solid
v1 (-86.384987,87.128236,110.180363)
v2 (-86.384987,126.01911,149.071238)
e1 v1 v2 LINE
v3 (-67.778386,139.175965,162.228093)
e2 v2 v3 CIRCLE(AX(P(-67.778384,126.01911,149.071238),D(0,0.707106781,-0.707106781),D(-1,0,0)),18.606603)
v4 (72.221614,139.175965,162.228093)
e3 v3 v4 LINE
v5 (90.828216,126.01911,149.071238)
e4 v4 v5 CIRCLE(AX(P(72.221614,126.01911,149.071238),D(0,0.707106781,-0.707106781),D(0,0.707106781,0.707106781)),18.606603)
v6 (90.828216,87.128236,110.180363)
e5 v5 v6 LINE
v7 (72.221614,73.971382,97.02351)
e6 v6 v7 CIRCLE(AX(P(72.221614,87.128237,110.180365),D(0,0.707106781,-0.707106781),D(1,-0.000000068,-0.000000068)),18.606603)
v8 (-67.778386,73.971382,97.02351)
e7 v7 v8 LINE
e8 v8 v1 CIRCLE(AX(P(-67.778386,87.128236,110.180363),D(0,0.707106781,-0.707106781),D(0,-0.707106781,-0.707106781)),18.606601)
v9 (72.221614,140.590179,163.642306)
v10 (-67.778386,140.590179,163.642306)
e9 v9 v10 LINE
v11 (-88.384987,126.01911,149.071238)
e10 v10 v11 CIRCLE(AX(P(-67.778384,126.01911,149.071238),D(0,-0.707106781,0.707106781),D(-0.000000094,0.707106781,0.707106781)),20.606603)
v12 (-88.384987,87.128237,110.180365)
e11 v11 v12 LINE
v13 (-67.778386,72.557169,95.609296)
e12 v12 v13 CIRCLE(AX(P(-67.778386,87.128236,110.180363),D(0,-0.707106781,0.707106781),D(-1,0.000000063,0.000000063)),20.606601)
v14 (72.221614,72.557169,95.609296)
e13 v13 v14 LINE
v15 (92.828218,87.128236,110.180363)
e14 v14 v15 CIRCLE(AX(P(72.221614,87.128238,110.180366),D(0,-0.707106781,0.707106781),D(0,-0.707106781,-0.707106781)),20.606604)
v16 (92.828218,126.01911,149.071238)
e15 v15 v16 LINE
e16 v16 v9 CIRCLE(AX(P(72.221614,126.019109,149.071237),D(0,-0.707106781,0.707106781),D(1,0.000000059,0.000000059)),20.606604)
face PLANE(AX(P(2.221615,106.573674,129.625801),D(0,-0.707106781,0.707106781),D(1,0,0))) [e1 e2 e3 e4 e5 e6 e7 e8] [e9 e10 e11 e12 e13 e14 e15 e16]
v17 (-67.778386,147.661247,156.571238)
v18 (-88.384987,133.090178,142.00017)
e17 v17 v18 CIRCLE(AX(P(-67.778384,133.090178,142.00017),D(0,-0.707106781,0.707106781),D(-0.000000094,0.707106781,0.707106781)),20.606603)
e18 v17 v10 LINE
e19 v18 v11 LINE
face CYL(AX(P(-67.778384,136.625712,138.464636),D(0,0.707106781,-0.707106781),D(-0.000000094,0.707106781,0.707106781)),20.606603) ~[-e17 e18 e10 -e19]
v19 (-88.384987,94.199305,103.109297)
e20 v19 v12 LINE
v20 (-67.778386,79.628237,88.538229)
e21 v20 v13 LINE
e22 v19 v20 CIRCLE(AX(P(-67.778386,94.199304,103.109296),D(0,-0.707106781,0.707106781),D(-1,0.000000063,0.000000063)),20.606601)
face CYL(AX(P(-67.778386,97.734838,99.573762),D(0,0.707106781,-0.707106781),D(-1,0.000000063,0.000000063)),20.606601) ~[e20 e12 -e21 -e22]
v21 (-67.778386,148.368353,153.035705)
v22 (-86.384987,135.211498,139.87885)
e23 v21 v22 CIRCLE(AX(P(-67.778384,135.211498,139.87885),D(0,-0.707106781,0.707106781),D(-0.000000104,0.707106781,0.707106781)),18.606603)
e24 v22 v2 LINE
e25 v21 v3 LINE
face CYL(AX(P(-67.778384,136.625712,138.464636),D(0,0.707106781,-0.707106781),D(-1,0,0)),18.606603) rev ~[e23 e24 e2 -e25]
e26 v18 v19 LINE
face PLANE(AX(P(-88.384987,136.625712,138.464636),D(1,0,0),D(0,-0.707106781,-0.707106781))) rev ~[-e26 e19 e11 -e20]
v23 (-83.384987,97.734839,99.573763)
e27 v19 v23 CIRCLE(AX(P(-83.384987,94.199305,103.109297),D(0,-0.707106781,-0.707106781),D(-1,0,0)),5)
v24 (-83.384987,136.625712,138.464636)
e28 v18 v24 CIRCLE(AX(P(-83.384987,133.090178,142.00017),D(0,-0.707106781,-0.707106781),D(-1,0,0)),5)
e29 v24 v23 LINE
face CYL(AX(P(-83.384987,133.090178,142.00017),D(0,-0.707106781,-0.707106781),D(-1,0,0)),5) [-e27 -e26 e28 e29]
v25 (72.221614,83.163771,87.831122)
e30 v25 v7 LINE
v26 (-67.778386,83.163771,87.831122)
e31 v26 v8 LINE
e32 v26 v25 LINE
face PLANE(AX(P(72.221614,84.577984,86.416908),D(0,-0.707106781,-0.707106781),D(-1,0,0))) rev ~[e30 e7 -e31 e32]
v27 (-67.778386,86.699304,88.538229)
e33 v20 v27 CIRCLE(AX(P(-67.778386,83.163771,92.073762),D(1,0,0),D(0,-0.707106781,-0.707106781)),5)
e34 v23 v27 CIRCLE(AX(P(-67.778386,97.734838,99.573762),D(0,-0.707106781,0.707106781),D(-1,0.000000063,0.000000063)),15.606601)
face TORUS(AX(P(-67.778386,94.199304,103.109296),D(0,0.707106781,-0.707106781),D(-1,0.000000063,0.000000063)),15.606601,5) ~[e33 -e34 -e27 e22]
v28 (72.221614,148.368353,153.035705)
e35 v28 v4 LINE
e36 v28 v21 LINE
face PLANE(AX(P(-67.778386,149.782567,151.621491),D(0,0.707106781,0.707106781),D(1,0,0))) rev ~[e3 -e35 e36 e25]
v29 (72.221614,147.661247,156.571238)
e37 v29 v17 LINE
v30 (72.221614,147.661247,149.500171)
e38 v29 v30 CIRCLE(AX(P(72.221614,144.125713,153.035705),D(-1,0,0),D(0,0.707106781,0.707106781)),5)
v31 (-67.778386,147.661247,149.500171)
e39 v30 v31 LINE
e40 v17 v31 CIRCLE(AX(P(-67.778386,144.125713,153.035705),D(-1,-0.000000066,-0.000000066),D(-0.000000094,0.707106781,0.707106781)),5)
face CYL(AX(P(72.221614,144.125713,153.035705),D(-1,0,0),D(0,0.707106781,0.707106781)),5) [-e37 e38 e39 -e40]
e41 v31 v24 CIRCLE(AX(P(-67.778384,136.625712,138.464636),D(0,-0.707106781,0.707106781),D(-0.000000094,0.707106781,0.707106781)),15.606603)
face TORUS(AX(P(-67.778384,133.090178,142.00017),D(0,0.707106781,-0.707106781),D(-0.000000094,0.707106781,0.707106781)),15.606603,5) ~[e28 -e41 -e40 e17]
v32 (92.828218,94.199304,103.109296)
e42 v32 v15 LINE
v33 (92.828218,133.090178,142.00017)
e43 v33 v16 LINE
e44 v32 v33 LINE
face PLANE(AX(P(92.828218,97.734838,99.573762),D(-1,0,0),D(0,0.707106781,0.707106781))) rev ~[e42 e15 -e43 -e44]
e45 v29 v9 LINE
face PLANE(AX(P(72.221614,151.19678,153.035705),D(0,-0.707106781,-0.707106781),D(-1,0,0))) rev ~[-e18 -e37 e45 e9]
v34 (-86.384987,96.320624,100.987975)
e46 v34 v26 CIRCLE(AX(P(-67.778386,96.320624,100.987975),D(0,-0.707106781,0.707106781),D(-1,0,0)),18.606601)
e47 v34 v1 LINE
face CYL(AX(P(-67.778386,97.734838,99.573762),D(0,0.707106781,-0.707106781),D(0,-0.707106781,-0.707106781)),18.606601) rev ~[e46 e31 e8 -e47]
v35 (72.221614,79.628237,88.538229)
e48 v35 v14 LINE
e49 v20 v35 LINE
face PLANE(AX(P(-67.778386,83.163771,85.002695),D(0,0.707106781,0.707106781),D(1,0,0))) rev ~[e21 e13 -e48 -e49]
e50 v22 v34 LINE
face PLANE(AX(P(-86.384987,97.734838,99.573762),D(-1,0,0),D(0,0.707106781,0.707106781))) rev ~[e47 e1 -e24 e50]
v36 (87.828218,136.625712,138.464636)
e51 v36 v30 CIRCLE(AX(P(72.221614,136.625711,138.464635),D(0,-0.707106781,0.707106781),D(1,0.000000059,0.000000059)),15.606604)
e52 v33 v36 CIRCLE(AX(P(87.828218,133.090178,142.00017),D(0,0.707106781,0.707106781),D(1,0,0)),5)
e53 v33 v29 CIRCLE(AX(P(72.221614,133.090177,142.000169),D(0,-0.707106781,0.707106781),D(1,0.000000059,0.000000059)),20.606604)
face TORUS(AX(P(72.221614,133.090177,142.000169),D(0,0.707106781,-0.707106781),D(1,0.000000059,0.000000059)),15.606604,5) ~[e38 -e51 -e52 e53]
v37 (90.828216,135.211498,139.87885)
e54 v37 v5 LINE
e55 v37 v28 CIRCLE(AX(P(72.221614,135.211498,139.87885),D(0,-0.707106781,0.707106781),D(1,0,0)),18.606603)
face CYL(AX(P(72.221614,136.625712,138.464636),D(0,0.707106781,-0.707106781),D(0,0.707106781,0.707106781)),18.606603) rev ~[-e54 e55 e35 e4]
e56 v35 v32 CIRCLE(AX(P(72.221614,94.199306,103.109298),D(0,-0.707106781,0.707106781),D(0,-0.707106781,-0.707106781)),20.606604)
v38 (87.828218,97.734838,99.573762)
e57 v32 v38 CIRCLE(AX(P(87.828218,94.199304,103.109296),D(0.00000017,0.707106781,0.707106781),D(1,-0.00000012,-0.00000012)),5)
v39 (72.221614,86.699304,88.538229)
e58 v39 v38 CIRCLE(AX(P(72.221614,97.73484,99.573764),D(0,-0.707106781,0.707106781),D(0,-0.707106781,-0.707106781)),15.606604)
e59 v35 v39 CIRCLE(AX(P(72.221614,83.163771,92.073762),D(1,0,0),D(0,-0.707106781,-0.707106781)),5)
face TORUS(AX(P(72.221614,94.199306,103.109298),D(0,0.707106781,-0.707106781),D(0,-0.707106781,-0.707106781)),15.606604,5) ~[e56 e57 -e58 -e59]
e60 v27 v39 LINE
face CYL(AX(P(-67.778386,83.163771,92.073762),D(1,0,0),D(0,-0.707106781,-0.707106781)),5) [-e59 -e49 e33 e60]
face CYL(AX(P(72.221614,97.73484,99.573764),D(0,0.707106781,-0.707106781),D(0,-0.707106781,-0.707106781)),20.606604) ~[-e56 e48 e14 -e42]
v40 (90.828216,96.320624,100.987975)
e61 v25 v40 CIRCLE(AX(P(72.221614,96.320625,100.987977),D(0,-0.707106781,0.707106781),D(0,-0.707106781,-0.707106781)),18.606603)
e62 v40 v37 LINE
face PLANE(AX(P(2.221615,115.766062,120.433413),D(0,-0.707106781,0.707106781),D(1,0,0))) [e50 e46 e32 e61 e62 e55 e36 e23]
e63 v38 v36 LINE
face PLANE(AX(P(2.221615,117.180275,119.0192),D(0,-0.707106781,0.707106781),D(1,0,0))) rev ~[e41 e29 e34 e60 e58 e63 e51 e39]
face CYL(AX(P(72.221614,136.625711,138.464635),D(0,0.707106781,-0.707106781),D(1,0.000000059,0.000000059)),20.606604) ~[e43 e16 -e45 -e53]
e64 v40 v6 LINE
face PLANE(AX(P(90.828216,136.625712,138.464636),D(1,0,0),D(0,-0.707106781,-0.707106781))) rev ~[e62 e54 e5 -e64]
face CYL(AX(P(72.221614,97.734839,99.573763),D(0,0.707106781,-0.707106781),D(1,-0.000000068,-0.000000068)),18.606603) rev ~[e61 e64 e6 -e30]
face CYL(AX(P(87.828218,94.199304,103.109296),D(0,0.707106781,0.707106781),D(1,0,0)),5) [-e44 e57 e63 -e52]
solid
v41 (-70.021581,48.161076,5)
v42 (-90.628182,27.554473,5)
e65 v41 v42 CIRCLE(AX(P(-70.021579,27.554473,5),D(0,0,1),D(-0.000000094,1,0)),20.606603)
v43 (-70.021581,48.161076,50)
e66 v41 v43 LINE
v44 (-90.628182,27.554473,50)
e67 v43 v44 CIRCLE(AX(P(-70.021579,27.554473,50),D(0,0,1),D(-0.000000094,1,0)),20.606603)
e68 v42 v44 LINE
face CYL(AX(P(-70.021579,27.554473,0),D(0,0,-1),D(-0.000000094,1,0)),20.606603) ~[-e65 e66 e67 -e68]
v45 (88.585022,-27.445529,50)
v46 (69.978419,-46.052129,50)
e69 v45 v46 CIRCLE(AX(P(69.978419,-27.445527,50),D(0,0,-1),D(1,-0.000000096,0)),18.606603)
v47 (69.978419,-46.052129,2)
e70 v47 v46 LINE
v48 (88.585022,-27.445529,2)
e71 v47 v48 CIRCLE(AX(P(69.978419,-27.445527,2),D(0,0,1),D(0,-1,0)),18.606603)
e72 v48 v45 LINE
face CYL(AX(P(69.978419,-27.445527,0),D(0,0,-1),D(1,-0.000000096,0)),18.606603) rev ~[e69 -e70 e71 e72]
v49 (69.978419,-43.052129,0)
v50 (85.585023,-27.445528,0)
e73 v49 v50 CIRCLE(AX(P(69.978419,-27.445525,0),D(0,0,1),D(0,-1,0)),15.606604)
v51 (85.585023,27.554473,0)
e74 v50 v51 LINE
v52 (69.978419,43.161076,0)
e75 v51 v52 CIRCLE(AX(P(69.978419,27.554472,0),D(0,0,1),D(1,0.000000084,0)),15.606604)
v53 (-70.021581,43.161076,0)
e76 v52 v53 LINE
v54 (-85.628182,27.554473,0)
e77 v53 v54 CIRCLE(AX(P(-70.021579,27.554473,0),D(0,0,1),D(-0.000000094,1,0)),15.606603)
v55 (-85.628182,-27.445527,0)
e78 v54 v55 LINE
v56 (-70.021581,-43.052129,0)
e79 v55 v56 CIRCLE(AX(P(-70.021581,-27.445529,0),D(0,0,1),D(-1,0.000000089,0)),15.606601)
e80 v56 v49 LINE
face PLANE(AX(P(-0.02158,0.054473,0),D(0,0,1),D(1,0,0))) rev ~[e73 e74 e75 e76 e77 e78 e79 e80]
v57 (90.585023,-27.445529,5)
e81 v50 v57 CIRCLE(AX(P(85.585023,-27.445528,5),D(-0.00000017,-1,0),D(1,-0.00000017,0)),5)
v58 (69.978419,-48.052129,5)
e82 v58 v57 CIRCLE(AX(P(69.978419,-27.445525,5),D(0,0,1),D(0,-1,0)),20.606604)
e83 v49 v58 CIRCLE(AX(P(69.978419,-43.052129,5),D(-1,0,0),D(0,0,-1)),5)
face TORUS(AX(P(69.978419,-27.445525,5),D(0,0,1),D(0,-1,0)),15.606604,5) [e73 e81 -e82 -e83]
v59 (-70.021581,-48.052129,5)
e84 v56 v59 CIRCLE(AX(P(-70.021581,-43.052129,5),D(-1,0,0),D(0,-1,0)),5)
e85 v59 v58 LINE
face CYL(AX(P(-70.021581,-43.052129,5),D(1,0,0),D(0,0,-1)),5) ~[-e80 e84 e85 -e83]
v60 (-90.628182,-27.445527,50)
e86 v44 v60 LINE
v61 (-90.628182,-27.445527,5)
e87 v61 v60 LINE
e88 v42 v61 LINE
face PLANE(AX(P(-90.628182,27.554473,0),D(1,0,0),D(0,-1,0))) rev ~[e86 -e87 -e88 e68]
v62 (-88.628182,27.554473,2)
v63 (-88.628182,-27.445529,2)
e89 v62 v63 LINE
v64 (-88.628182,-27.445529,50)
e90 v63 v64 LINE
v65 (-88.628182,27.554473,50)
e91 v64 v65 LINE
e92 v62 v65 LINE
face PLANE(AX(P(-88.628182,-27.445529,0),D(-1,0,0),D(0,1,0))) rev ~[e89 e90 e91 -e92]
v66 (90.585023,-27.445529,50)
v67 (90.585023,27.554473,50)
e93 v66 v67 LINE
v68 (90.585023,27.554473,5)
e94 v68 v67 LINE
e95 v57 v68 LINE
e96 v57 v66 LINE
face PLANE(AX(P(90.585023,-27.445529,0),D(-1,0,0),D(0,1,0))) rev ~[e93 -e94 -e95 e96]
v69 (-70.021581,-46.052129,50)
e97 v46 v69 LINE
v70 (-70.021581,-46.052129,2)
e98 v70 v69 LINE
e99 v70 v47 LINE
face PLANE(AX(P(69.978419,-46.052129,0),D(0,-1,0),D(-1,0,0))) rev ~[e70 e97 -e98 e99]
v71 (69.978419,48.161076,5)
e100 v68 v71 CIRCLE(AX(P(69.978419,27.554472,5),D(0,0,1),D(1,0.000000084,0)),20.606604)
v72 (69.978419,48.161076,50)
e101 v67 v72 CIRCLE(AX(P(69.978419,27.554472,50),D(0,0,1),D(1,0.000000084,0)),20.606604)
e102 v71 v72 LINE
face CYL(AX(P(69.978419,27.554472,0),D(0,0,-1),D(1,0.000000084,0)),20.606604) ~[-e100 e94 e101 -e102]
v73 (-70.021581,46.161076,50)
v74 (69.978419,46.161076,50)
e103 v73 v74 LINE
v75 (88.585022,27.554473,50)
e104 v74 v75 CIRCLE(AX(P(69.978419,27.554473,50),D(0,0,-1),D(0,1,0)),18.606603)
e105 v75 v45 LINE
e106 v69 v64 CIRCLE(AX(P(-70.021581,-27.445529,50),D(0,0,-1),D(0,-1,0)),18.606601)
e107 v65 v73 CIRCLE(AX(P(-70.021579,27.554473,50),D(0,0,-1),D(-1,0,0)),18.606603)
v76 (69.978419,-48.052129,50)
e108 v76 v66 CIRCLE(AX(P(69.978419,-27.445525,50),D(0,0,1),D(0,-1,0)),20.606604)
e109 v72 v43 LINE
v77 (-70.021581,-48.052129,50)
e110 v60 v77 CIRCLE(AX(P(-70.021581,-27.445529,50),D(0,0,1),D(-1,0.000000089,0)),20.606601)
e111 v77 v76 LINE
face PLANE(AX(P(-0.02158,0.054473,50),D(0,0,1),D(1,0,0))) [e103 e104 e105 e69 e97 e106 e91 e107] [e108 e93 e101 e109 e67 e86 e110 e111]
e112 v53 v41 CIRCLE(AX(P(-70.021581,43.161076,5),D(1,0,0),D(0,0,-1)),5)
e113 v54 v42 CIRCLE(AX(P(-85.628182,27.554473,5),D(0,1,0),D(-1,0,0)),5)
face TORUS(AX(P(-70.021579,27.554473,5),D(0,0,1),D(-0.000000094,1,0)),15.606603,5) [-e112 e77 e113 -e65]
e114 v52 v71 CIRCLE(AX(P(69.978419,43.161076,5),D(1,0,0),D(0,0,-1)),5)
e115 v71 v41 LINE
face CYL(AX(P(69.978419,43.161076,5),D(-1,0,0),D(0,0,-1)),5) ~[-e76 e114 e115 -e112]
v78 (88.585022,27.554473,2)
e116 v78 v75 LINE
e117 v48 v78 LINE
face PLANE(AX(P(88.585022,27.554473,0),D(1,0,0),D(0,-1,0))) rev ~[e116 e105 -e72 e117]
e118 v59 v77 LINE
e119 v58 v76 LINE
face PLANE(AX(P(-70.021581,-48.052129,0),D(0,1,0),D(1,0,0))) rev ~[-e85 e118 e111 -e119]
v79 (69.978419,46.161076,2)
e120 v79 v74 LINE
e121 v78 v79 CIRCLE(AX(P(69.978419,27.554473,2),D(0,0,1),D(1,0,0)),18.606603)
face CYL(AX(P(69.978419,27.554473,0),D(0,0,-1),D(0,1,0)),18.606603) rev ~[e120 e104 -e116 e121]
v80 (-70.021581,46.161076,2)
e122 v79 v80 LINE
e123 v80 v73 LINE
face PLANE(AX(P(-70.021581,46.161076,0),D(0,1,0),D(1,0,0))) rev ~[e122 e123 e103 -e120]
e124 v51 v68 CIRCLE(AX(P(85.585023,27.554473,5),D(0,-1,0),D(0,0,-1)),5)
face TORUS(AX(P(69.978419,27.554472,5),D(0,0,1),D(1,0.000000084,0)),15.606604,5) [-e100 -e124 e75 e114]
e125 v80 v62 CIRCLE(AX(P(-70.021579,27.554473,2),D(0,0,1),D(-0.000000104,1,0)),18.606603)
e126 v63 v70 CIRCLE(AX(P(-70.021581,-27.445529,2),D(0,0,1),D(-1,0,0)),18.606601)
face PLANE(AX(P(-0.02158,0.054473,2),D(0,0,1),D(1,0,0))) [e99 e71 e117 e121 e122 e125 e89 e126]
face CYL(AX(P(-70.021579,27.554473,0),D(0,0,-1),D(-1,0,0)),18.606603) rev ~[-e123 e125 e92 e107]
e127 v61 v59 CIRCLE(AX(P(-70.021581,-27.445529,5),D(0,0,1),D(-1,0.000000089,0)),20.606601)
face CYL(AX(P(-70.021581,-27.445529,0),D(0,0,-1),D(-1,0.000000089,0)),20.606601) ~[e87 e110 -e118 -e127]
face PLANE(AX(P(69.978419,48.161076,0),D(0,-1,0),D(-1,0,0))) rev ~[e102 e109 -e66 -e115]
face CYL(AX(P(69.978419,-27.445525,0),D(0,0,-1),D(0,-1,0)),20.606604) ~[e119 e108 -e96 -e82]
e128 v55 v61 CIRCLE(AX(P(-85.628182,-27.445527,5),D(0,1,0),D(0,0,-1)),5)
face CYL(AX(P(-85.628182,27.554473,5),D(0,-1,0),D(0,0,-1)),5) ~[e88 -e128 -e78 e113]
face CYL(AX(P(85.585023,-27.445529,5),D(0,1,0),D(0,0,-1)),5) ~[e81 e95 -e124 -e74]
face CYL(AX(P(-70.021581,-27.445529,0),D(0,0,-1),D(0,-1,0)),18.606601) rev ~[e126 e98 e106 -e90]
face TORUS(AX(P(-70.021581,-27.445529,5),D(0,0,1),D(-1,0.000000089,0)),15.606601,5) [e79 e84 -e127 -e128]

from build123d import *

# Parameters (mm, degrees)
F1_DEPTH = 50
F2_DEPTH = 2
F5_DEPTH = 2
F6_DEPTH = 15
F8_W     = 20
F8_H     = 2.4975641537
F9_DEPTH = 2
F10_R    = 5
F11_R    = 5


# Not quite as in the source:
# - a feature names something its author has since deleted; it is built from what else it names


with BuildPart() as f1:
    # F0 (on Top) → F1 (new body)
    with BuildSketch(Plane.XY):
        with BuildLine():
            ThreePointArc((-70.0215809153, 48.1610759377), (-84.5926481603, 42.1255410641), (-90.6281816654, 27.5544732523))
            Line((-90.6281816654, 27.5544732523), (-90.6281816654, -27.4455267477))
            ThreePointArc((-90.6281816654, -27.4455267477), (-84.5926486755, -42.0165950962), (-70.0215808636, -48.0521293815))
            Line((-70.0215808636, -48.0521293815), (69.9784191364, -48.0521293815))
            ThreePointArc((69.9784191364, -48.0521293815), (84.5494875406, -42.0165959566), (90.5850234457, -27.4455285797))
            Line((90.5850234457, -27.4455285797), (90.5850234457, 27.5544733039))
            ThreePointArc((90.5850234457, 27.5544733039), (84.5494881549, 42.1255418682), (69.9784190847, 48.1610759377))
            Line((69.9784190847, 48.1610759377), (-70.0215809153, 48.1610759377))
        make_face()
        with BuildLine():
            Line((69.9784191364, -46.0521293815), (-70.0215808636, -46.0521293815))
            ThreePointArc((-70.0215808636, -46.0521293815), (-83.1784344654, -40.6023821815), (-88.6281816654, -27.4455285797))
            Line((-88.6281816654, -27.4455285797), (-88.6281816654, 27.5544732523))
            ThreePointArc((-88.6281816654, 27.5544732523), (-83.1784345979, 40.7113275017), (-70.0215809153, 46.1610759377))
            Line((-70.0215809153, 46.1610759377), (69.9784190847, 46.1610759377))
            ThreePointArc((69.9784190847, 46.1610759377), (83.1352739819, 40.7113282011), (88.5850217185, 27.5544733039))
            Line((88.5850217185, 27.5544733039), (88.5850217185, -27.4455285797))
            ThreePointArc((88.5850217185, -27.4455285797), (83.1352733676, -40.6023822895), (69.9784191364, -46.0521293815))
        make_face(mode=Mode.SUBTRACT)
    extrude(amount=F1_DEPTH)

    # F0 (on Top) → F2 (join)
    with BuildSketch(Plane.XY):
        with BuildLine():
            ThreePointArc((-88.6281816654, -27.4455285797), (-83.1784344654, -40.6023821815), (-70.0215808636, -46.0521293815))
            Line((-70.0215808636, -46.0521293815), (69.9784191364, -46.0521293815))
            ThreePointArc((69.9784191364, -46.0521293815), (83.1352733676, -40.6023822895), (88.5850217185, -27.4455285797))
            Line((88.5850217185, -27.4455285797), (88.5850217185, 27.5544733039))
            ThreePointArc((88.5850217185, 27.5544733039), (83.1352739819, 40.7113282011), (69.9784190847, 46.1610759377))
            Line((69.9784190847, 46.1610759377), (-70.0215809153, 46.1610759377))
            ThreePointArc((-70.0215809153, 46.1610759377), (-83.1784345979, 40.7113275017), (-88.6281816654, 27.5544732523))
            Line((-88.6281816654, 27.5544732523), (-88.6281816654, -27.4455285797))
        make_face()
    extrude(amount=F2_DEPTH)

    # F8 (on face) → F9 (cut)
    with BuildSketch(Plane(origin=(0, 84.0832325734, 84.0832325734), x_dir=(1, 0, 0), z_dir=(0, -0.7071067812, -0.7071067812))):
        with Locations((0, -0.5405465653)):
            Rectangle(F8_W, F8_H)
    extrude(amount=-F9_DEPTH, mode=Mode.SUBTRACT)

    # F11
    f11_edges = [f1.edges().sort_by_distance(p)[0] for p in [
        (-0.021581, 48.161076, 0),
        (-84.592648, 42.125541, 0),
        (-90.628182, 0.054473, 0),
        (-84.592649, -42.016595, 0),
        (-0.021581, -48.052129, 0),
        (84.549488, -42.016596, 0),
        (90.585023, 0.054472, 0),
        (84.549488, 42.125542, 0),
    ]]
    fillet(f11_edges, radius=F11_R)


with BuildPart() as f5:
    # F4 (on face) → F5 (new body)
    with BuildSketch(Plane(origin=(0, -0.9194620312, 0.9194620312), x_dir=(1, 0, 0), z_dir=(0, -0.7071067812, 0.7071067812))):
        with BuildLine():
            ThreePointArc((-86.3849869775, 139.5182486753), (-80.9352397774, 126.3613950735), (-67.7783861756, 120.9116478734))
            Line((-67.7783861756, 120.9116478734), (72.2216138244, 120.9116478734))
            ThreePointArc((72.2216138244, 120.9116478734), (85.3784680556, 126.3613949655), (90.8282164065, 139.5182486753))
            Line((90.8282164065, 139.5182486753), (90.8282164065, 194.5182505589))
            ThreePointArc((90.8282164065, 194.5182505589), (85.3784686699, 207.675105456), (72.2216137727, 213.1248531926))
            Line((72.2216137727, 213.1248531926), (-67.7783862273, 213.1248531926))
            ThreePointArc((-67.7783862273, 213.1248531926), (-80.93523991, 207.6751047567), (-86.3849869775, 194.5182505072))
            Line((-86.3849869775, 194.5182505072), (-86.3849869775, 139.5182486753))
        make_face()
    extrude(amount=F5_DEPTH)

    # F4 (on face) → F6 (join)
    with BuildSketch(Plane(origin=(0, -0.9194620312, 0.9194620312), x_dir=(1, 0, 0), z_dir=(0, -0.7071067812, 0.7071067812))):
        with BuildLine():
            ThreePointArc((-67.7783862273, 215.1248531926), (-82.3494534723, 209.0893183191), (-88.3849869775, 194.5182505072))
            Line((-88.3849869775, 194.5182505072), (-88.3849869775, 139.5182505072))
            ThreePointArc((-88.3849869775, 139.5182505072), (-82.3494539875, 124.9471821588), (-67.7783861756, 118.9116478734))
            Line((-67.7783861756, 118.9116478734), (72.2216138244, 118.9116478734))
            ThreePointArc((72.2216138244, 118.9116478734), (86.7926822286, 124.9471812983), (92.8282181337, 139.5182486753))
            Line((92.8282181337, 139.5182486753), (92.8282181337, 194.5182505589))
            ThreePointArc((92.8282181337, 194.5182505589), (86.7926828429, 209.0893191232), (72.2216137727, 215.1248531926))
            Line((72.2216137727, 215.1248531926), (-67.7783862273, 215.1248531926))
        make_face()
        with BuildLine():
            Line((72.2216138244, 120.9116478734), (-67.7783861756, 120.9116478734))
            ThreePointArc((-67.7783861756, 120.9116478734), (-80.9352397774, 126.3613950735), (-86.3849869775, 139.5182486753))
            Line((-86.3849869775, 139.5182486753), (-86.3849869775, 194.5182505072))
            ThreePointArc((-86.3849869775, 194.5182505072), (-80.93523991, 207.6751047567), (-67.7783862273, 213.1248531926))
            Line((-67.7783862273, 213.1248531926), (72.2216137727, 213.1248531926))
            ThreePointArc((72.2216137727, 213.1248531926), (85.3784686699, 207.675105456), (90.8282164065, 194.5182505589))
            Line((90.8282164065, 194.5182505589), (90.8282164065, 139.5182486753))
            ThreePointArc((90.8282164065, 139.5182486753), (85.3784680556, 126.3613949655), (72.2216138244, 120.9116478734))
        make_face(mode=Mode.SUBTRACT)
    extrude(amount=F6_DEPTH)

    # F10
    f10_edges = [f5.edges().sort_by_distance(p)[0] for p in [
        (-82.349453, 146.929013, 148.767937),
        (-88.384987, 117.180275, 119.0192),
        (-82.349454, 87.431538, 89.270462),
        (2.221614, 83.163771, 85.002695),
        (86.792682, 87.431537, 89.270461),
        (92.828218, 117.180275, 119.019199),
        (86.792683, 146.929013, 148.767937),
        (2.221614, 151.19678, 153.035705),
    ]]
    fillet(f10_edges, radius=F10_R)


solid = Compound([f1.part, f5.part])
